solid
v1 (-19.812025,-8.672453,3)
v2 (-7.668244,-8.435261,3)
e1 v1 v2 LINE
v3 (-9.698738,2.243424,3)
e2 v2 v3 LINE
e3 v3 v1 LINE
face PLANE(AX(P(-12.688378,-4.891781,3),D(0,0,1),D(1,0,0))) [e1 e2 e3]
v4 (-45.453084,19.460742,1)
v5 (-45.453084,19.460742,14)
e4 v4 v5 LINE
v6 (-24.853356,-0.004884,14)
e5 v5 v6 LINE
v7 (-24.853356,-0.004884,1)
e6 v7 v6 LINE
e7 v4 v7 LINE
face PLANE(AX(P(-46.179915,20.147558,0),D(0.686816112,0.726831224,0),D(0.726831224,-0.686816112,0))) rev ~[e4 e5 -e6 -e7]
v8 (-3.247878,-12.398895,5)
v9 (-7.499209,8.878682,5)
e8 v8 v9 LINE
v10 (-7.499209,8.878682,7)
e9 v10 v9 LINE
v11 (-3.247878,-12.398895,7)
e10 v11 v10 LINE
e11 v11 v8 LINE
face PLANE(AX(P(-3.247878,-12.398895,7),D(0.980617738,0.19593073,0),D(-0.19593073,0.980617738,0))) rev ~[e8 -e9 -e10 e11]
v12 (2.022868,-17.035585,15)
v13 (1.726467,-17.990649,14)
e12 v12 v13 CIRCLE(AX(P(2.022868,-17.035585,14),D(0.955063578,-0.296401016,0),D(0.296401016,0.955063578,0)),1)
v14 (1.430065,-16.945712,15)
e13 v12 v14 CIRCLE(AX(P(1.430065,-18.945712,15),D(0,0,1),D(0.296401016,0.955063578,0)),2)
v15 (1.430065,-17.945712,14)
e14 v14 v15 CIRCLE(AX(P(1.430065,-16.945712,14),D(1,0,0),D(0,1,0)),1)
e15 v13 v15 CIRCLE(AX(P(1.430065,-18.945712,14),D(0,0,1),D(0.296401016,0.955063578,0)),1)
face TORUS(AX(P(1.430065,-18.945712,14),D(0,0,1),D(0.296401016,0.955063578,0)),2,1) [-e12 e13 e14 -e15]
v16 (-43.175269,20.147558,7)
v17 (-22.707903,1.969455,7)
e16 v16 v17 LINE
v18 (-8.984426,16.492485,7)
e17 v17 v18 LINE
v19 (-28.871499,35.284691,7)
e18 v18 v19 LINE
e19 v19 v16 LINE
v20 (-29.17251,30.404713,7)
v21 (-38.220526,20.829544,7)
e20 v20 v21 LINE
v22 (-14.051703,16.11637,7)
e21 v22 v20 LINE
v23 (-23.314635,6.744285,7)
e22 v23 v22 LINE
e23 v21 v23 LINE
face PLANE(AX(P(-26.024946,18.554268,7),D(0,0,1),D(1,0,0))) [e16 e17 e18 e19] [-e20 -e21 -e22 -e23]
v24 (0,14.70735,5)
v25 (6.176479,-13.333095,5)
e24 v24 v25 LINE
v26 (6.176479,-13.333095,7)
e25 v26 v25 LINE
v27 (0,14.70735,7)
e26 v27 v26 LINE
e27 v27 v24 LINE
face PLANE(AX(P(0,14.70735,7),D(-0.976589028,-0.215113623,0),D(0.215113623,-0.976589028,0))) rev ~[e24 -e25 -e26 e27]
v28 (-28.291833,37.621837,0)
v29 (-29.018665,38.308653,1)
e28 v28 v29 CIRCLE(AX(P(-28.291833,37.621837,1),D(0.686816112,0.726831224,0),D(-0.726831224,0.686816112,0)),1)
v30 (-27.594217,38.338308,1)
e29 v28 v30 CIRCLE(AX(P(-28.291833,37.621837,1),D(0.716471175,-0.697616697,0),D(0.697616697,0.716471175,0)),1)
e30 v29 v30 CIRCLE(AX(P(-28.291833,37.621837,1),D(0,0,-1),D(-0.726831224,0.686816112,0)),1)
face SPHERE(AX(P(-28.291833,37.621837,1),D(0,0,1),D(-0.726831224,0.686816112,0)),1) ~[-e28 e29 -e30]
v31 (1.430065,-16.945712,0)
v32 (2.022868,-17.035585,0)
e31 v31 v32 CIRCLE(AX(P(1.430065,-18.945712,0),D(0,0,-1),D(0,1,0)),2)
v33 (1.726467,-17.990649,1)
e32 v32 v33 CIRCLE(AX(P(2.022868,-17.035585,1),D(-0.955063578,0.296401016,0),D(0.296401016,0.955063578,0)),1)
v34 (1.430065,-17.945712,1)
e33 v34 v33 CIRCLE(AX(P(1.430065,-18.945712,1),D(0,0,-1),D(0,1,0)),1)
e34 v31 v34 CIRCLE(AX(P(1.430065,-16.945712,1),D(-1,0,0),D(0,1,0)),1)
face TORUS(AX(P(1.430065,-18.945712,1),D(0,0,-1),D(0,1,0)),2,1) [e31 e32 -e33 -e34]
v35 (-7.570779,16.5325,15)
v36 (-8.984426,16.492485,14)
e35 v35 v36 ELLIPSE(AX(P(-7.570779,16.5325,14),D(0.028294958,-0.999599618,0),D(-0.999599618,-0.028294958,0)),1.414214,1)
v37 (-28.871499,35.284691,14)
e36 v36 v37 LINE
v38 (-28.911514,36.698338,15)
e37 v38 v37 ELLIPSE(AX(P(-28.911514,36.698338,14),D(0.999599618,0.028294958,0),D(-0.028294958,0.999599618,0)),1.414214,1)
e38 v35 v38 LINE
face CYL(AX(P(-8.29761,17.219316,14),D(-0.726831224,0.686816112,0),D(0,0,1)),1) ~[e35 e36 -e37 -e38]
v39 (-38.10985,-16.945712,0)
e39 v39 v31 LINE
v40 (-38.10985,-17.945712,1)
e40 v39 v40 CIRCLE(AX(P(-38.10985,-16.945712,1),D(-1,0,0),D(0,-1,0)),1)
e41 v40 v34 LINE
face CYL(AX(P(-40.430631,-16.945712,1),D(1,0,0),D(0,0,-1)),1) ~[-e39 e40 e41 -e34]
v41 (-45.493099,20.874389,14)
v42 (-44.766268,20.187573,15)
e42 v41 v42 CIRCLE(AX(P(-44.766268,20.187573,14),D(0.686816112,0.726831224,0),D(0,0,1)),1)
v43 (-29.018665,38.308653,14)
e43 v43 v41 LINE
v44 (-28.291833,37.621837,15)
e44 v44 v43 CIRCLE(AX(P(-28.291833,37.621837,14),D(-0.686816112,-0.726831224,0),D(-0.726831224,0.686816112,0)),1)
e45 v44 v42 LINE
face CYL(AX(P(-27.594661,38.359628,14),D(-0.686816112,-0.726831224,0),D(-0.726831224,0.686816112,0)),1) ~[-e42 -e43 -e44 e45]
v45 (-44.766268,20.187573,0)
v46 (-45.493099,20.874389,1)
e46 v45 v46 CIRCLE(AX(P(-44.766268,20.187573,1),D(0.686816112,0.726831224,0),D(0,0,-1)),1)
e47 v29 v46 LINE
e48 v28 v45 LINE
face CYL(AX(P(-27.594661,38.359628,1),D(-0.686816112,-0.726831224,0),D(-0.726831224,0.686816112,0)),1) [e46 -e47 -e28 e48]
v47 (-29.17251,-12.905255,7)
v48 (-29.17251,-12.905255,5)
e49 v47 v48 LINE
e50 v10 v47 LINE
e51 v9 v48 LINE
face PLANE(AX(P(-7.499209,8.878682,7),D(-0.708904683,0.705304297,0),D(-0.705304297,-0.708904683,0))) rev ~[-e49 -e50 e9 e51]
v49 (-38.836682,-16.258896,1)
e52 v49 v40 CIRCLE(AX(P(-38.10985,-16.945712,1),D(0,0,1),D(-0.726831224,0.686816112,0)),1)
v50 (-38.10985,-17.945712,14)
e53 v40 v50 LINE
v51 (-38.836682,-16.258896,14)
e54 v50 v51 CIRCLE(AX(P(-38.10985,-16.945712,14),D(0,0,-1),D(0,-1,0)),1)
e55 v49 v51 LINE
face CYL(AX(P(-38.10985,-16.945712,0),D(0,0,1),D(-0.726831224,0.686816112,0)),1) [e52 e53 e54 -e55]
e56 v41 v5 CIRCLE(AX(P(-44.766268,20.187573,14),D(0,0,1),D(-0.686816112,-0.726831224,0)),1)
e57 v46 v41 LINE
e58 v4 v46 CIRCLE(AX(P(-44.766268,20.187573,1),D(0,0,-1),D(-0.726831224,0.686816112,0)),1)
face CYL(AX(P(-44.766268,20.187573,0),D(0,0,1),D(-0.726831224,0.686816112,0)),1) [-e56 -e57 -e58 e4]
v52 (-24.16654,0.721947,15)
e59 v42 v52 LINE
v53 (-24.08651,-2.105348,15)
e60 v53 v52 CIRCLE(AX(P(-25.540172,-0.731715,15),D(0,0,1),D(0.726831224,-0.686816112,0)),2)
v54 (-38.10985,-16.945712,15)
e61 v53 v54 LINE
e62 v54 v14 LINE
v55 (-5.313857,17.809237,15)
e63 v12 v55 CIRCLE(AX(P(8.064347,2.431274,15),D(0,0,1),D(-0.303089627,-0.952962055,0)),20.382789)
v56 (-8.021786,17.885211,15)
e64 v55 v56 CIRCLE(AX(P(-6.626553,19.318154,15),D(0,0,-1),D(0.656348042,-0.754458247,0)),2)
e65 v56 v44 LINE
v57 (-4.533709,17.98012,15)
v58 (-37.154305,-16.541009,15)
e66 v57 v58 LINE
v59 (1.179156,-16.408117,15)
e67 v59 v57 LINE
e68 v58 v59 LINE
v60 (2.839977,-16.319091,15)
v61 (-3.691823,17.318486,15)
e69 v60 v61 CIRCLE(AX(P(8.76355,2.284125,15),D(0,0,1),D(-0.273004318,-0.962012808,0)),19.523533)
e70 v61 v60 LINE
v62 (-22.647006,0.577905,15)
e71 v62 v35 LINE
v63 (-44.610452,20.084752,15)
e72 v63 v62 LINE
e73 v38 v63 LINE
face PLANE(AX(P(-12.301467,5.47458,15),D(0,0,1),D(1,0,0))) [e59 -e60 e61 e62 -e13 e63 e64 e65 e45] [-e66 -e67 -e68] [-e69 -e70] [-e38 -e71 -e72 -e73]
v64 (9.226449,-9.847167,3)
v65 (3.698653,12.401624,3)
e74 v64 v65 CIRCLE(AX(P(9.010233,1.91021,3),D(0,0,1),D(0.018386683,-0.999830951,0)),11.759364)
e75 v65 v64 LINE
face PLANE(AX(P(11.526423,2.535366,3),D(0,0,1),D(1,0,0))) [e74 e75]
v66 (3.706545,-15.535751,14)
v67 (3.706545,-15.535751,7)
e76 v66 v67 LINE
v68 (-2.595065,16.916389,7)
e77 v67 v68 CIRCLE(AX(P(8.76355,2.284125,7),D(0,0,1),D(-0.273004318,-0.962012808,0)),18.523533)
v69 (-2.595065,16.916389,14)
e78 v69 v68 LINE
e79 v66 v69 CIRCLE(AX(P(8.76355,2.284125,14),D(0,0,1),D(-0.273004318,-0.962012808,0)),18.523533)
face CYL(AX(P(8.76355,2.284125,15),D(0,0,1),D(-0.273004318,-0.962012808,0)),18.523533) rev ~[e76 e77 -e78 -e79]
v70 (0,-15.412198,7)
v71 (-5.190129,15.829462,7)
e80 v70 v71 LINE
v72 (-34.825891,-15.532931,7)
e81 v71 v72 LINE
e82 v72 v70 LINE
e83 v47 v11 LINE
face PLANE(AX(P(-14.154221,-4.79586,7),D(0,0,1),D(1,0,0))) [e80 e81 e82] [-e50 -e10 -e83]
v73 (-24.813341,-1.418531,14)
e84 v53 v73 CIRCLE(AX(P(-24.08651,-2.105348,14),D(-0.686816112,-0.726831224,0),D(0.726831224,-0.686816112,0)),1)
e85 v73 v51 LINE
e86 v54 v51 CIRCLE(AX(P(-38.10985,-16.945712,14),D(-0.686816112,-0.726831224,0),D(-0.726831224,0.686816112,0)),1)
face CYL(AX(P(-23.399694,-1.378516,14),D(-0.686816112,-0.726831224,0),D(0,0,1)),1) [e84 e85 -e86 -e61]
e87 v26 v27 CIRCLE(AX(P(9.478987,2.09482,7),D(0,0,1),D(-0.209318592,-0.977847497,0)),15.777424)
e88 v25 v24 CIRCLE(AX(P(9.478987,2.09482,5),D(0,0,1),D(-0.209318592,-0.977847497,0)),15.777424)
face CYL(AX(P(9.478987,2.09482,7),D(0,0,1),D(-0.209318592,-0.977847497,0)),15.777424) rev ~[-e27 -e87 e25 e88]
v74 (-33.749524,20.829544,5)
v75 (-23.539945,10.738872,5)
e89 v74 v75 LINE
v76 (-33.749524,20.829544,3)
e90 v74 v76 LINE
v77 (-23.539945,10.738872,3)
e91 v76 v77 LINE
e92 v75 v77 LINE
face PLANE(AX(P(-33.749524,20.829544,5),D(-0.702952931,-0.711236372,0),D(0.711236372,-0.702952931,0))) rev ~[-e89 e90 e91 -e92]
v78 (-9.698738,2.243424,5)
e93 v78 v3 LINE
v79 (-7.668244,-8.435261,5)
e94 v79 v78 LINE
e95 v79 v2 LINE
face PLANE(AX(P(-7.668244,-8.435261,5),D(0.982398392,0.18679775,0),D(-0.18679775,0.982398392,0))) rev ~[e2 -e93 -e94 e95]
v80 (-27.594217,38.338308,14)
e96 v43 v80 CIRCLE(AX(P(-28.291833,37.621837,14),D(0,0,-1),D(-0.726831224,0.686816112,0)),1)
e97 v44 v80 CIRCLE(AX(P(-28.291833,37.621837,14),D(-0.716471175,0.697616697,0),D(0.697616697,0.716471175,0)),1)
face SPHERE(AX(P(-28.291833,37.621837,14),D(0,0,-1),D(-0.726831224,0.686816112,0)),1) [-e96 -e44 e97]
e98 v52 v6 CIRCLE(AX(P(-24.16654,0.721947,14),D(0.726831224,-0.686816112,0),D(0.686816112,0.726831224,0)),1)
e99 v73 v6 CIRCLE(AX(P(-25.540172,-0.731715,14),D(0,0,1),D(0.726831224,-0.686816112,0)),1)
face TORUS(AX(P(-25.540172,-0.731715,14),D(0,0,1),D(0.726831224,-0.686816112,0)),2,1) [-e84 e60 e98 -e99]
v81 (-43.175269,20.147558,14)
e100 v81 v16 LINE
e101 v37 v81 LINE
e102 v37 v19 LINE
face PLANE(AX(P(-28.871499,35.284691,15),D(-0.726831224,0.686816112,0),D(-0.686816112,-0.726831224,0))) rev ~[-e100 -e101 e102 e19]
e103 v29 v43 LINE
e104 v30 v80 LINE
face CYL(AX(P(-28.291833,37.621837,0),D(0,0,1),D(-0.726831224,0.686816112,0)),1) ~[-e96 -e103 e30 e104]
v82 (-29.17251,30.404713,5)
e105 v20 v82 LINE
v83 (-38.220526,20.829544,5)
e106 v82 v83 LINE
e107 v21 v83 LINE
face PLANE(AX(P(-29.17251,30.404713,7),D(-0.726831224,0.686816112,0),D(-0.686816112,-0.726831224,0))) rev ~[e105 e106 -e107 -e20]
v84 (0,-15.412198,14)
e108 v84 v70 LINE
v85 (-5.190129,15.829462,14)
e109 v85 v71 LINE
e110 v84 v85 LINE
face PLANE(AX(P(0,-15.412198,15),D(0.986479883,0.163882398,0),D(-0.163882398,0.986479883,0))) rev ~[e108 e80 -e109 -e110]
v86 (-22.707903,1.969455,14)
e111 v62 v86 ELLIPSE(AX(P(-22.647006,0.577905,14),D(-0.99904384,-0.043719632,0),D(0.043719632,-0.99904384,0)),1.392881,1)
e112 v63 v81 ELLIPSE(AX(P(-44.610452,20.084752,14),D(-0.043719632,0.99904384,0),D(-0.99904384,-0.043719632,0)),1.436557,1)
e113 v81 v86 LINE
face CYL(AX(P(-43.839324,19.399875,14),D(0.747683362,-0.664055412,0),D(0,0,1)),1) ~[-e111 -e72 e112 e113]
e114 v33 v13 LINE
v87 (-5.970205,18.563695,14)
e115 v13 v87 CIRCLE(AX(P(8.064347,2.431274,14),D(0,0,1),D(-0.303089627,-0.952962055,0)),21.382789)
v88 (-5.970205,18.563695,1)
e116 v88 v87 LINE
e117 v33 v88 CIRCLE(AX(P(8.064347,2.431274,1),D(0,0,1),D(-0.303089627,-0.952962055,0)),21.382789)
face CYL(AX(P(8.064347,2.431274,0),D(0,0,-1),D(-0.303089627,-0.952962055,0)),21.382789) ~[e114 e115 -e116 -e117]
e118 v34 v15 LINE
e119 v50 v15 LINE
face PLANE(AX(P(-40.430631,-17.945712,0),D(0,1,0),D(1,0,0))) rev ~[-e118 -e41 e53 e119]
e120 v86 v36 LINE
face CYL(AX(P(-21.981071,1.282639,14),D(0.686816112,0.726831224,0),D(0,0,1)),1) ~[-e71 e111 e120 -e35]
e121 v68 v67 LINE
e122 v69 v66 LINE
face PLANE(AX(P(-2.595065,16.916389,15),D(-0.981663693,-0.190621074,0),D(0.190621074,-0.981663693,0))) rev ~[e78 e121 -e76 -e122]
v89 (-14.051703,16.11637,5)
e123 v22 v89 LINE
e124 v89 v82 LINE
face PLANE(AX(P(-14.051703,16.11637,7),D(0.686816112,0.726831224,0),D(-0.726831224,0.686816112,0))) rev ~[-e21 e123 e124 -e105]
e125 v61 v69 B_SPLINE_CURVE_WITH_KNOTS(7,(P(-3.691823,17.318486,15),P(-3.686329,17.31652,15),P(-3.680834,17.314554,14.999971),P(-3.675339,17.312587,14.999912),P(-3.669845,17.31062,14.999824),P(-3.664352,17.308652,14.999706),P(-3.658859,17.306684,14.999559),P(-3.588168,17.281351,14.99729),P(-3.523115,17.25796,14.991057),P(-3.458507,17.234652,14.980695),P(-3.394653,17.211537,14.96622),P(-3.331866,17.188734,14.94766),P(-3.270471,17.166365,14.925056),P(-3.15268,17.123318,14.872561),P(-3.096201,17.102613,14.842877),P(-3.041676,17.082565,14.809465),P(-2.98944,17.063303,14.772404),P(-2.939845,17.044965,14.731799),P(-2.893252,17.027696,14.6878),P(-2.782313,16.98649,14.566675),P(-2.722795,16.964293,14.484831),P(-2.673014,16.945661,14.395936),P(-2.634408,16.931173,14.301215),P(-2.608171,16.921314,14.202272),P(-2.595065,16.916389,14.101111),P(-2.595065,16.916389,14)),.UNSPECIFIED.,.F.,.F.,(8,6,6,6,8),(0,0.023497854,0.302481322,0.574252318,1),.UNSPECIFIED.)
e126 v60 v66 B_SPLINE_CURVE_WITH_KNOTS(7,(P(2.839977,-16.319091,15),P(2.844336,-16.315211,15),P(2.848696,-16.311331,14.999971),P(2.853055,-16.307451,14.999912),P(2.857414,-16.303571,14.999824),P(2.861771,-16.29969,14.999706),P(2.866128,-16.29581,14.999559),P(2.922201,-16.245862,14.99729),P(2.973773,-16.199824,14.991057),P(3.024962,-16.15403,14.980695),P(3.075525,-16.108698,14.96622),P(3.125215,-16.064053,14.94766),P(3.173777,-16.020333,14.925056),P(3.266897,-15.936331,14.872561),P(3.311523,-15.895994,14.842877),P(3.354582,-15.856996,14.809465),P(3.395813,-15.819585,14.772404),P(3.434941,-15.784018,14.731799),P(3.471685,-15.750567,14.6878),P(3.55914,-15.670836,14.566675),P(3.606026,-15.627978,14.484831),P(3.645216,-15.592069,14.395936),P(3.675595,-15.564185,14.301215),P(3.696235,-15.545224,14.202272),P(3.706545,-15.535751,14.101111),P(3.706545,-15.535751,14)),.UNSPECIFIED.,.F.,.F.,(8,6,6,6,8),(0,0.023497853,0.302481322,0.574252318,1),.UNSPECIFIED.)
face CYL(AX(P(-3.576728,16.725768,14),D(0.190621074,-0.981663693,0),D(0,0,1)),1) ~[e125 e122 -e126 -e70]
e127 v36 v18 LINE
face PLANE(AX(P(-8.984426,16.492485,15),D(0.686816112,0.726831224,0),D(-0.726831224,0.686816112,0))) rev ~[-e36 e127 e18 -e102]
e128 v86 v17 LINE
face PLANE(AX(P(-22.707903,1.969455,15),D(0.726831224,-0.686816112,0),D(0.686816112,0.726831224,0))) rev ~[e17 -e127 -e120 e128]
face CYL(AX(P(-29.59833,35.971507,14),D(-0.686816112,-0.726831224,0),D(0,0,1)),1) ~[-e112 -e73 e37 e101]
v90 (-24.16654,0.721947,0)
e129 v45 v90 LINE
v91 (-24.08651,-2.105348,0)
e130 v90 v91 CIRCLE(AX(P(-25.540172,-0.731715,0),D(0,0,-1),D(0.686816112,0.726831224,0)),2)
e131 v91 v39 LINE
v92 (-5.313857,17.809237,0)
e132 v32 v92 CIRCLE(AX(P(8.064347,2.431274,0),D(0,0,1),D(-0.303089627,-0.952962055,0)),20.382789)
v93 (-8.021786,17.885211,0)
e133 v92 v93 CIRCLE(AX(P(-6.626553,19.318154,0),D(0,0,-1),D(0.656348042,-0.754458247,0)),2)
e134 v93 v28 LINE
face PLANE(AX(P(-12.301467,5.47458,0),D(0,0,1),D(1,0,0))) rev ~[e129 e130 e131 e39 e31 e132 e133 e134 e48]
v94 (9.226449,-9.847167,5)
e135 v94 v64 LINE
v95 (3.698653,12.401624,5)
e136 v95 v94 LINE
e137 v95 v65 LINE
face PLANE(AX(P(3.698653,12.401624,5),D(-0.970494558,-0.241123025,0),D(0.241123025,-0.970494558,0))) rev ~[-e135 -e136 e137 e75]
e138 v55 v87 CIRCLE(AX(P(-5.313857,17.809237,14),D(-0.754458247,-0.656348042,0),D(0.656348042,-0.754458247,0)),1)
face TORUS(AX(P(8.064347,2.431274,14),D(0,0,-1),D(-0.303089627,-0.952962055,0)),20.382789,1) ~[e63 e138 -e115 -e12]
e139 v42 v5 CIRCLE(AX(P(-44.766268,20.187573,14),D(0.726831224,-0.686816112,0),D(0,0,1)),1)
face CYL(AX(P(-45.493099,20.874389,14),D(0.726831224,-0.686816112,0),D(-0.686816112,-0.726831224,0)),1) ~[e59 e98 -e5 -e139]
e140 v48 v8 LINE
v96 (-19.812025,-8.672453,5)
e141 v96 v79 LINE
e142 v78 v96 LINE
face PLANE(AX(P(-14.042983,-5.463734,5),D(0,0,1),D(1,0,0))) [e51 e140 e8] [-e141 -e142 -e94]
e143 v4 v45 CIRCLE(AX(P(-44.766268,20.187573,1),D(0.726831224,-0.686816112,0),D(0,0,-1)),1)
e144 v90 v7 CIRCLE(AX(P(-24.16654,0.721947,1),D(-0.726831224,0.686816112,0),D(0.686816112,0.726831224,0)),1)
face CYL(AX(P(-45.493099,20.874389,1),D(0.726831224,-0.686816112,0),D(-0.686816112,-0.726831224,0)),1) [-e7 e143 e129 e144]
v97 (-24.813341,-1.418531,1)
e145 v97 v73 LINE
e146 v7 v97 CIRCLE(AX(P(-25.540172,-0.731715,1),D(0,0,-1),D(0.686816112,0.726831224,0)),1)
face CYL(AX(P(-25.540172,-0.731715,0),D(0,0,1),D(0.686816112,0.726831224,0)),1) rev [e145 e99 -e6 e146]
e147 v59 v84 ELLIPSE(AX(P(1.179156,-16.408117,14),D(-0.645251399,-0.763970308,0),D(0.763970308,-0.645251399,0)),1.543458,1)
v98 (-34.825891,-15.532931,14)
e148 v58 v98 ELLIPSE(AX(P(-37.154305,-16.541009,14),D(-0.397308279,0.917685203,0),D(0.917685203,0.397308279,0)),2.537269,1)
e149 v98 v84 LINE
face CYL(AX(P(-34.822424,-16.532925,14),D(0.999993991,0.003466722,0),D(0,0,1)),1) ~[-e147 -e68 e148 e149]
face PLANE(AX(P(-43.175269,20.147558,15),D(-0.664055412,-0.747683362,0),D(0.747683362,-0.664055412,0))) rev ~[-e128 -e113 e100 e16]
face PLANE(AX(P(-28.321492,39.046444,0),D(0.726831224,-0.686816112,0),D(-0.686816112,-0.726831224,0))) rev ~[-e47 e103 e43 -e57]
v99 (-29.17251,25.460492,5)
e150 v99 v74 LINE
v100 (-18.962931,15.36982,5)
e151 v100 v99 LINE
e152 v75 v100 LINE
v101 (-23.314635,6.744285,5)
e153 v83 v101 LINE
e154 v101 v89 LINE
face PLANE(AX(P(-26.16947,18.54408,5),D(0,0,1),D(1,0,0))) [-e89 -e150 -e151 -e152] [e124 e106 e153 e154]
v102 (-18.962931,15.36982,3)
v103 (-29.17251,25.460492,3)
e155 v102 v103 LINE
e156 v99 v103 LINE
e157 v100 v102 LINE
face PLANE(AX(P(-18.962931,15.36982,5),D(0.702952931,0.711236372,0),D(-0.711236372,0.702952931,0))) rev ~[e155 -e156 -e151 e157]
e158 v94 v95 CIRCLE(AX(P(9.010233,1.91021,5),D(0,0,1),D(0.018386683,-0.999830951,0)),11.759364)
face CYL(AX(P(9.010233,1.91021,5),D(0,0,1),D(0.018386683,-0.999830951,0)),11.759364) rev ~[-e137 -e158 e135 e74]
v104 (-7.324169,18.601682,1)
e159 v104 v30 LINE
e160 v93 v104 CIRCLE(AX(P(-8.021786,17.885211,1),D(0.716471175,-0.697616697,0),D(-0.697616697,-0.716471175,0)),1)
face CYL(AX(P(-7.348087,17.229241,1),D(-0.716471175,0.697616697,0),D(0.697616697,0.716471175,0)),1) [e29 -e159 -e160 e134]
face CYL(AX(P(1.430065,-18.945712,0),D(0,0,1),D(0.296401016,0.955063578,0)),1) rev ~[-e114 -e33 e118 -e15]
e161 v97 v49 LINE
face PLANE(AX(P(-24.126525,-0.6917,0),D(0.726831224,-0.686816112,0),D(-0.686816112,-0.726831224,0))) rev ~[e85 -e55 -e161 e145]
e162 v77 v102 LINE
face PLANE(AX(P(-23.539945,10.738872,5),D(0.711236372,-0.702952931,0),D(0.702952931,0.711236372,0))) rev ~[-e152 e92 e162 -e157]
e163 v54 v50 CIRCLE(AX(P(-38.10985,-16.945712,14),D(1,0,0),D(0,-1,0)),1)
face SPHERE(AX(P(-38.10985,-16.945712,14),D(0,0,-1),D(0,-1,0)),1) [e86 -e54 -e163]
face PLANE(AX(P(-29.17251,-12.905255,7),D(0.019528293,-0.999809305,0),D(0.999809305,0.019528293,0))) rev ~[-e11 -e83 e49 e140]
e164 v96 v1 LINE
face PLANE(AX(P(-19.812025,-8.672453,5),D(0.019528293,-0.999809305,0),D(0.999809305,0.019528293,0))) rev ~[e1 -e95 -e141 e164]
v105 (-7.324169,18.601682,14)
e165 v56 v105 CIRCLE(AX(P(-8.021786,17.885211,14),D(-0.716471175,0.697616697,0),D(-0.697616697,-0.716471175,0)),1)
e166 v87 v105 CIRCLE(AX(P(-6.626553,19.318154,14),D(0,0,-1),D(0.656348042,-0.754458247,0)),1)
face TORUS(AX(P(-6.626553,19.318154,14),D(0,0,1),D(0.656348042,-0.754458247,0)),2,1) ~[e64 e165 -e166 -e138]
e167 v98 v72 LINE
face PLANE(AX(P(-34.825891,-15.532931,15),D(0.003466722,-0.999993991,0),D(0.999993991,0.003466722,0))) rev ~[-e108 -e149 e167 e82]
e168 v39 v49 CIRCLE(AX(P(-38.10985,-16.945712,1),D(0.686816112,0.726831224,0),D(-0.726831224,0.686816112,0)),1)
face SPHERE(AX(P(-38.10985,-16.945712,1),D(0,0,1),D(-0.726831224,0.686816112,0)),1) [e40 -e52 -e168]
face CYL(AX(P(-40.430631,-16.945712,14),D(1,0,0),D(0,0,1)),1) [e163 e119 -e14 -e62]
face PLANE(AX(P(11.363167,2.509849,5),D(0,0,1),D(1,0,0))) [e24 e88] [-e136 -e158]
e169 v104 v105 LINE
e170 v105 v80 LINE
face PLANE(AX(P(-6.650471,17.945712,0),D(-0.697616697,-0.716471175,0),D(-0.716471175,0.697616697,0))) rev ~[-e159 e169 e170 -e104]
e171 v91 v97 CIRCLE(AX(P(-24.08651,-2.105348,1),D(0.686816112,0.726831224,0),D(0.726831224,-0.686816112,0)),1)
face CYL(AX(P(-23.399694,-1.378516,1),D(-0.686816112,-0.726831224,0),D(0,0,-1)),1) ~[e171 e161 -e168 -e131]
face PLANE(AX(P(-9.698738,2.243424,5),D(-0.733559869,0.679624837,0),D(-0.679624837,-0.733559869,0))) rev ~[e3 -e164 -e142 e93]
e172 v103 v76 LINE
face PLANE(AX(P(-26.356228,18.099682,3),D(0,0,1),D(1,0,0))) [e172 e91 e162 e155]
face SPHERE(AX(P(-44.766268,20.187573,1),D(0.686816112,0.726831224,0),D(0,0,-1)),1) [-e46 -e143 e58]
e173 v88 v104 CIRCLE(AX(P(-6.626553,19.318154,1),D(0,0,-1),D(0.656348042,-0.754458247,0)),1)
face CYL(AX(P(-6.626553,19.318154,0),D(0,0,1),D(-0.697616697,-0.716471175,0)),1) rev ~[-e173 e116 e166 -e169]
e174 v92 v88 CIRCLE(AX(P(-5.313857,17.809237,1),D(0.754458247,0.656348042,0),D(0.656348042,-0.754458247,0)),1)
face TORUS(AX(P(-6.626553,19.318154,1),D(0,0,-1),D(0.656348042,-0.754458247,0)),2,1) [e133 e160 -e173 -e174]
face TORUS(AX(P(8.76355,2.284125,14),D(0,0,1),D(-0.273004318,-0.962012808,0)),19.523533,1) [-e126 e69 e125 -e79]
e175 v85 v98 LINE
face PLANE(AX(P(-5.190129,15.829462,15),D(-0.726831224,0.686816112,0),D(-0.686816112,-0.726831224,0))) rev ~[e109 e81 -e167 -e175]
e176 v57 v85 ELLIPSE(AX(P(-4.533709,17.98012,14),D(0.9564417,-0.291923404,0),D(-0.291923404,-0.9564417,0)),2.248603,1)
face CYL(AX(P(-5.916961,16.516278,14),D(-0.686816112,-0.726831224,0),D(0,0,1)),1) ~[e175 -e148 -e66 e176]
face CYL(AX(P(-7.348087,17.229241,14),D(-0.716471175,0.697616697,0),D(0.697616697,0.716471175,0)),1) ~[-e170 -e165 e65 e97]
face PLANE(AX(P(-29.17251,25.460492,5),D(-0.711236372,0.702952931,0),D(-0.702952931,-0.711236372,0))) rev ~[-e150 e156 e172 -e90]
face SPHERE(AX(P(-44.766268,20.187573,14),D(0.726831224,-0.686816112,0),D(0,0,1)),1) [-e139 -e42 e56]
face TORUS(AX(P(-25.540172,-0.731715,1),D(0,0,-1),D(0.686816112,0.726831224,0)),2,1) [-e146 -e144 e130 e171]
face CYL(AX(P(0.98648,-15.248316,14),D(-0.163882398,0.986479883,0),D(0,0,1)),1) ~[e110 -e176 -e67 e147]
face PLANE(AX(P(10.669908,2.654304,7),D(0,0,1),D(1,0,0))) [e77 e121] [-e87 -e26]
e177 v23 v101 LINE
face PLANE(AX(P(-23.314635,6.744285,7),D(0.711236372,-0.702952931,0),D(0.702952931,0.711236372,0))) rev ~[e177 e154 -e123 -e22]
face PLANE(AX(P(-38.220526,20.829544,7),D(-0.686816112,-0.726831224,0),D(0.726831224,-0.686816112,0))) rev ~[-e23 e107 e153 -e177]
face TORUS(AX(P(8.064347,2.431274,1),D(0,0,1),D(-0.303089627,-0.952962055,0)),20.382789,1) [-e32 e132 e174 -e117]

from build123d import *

# Parameters (mm, degrees)
F1_DEPTH  = 15
F3_DEPTH  = 8
F4_R      = 1
F6_DEPTH  = 2
F8_DEPTH  = 2
F10_DEPTH = 2
F12_DEPTH = 2


# Not quite as in the source:
# - a feature names something its author has since deleted; it is built from what else it names


with BuildPart() as f1:
    # F0 (on Top) → F1 (new body)
    with BuildSketch(Plane.XY):
        with BuildLine():
            Line((-28.3214918106, 39.0464443552), (-46.1799150741, 20.1475579913))
            Line((-46.1799150741, 20.1475579913), (-24.1265251153, -0.6917001902))
            Line((-24.1265251153, -0.6917001902), (-40.4306314886, -17.9457124323))
            Line((-40.4306314886, -17.9457124323), (1.5834453516, -17.9457124323))
            ThreePointArc((1.5834453516, -17.9457124323), (28.9057292456, 7.2125327526), (-6.6504706629, 17.9457124323))
            Line((-6.6504706629, 17.9457124323), (-28.3214918106, 39.0464443552))
        make_face()
    extrude(amount=F1_DEPTH)

    # F2 (on face) → F3 (cut)
    with BuildSketch(Plane.XY.offset(15)):
        with BuildLine():
            Line((-2.5950646959, 16.9163886458), (3.7065453362, -15.5357513577))
            ThreePointArc((3.7065453362, -15.5357513577), (26.9474296129, 5.8151003686), (-2.5950646959, 16.9163886458))
        make_face()
        Polygon((-5.1901293918, 15.8294621167), (-34.8258907848, -15.5329307781), (0, -15.4121983796), align=None)
        Polygon((-28.8714991264, 35.28469053), (-43.1752689183, 20.1475579913), (-22.7079026012, 1.9694547007), (-8.9844264049, 16.4924847199), align=None)
    extrude(amount=-F3_DEPTH, mode=Mode.SUBTRACT)

    # F4
    f4_edges = [f1.edges().sort_by_distance(p)[0] for p in [
        (-37.250703, 29.597001, 0),
        (-35.15322, 9.727929, 0),
        (-32.278578, -9.318706, 0),
        (-19.423593, -17.945712, 0),
        (28.905729, 7.212533, 0),
        (-17.485981, 28.496078, 0),
        (-18.927963, 25.888588, 15),
        (-36.023384, 27.716124, 15),
        (-32.941586, 11.058506, 15),
        (-15.846165, 9.23097, 15),
        (-17.412945, -15.472565, 15),
        (-20.00801, 0.148266, 15),
        (-2.595065, 0.208632, 15),
        (0.55574, 0.690319, 15),
        (26.94743, 5.8151, 15),
        (28.905729, 7.212533, 15),
        (-19.423593, -17.945712, 15),
        (-32.278578, -9.318706, 15),
        (-35.15322, 9.727929, 15),
        (-37.250703, 29.597001, 15),
        (-17.485981, 28.496078, 15),
        (-6.650471, 17.945712, 7.5),
        (-28.321492, 39.046444, 7.5),
        (-46.179915, 20.147558, 7.5),
        (-40.430631, -17.945712, 7.5),
        (-24.126525, -0.6917, 7.5),
        (1.583445, -17.945712, 7.5),
    ]]
    fillet(f4_edges, radius=F4_R)

    # F5 (on face) → F6 (cut)
    with BuildSketch(Plane.XY.offset(7)):
        Polygon((-29.1725099087, -12.9052552501), (-3.2478775829, -12.3988948762), (-7.4992091395, 8.8786818087), align=None)
        Polygon((-23.3146349898, 6.744285012), (-14.0517026385, 16.1163697069), (-29.1725099087, 30.4047130048), (-38.2205257573, 20.8295438638), align=None)
        with BuildLine():
            Line((0, 14.7073501721), (6.1764790816, -13.333094822))
            ThreePointArc((6.1764790816, -13.333094822), (24.8870467759, 5.4887589231), (0, 14.7073501721))
        make_face()
    extrude(amount=-F6_DEPTH, mode=Mode.SUBTRACT)

    # F7 (on face) → F8 (cut)
    with BuildSketch(Plane.XY.offset(5)):
        with BuildLine():
            Line((3.6986530758, 12.4016236514), (9.2264488339, -9.847166948))
            ThreePointArc((9.2264488339, -9.847166948), (20.4226323137, 4.7456631043), (3.6986530758, 12.4016236514))
        make_face()
    extrude(amount=-F8_DEPTH, mode=Mode.SUBTRACT)

    # F9 (on face) → F10 (cut)
    with BuildSketch(Plane.XY.offset(5)):
        Polygon((-9.698738344, 2.2434238344), (-19.8120251298, -8.6724534631), (-7.6682440939, -8.4352609186), align=None)
    extrude(amount=-F10_DEPTH, mode=Mode.SUBTRACT)

    # F11 (on face) → F12 (cut)
    with BuildSketch(Plane.XY.offset(5)):
        Polygon((-33.7495236595, 20.8295438638), (-23.5399451314, 10.7388715832), (-18.9629313805, 15.3698198505), (-29.1725099087, 25.4604921311), align=None)
    extrude(amount=-F12_DEPTH, mode=Mode.SUBTRACT)


solid = f1.part
